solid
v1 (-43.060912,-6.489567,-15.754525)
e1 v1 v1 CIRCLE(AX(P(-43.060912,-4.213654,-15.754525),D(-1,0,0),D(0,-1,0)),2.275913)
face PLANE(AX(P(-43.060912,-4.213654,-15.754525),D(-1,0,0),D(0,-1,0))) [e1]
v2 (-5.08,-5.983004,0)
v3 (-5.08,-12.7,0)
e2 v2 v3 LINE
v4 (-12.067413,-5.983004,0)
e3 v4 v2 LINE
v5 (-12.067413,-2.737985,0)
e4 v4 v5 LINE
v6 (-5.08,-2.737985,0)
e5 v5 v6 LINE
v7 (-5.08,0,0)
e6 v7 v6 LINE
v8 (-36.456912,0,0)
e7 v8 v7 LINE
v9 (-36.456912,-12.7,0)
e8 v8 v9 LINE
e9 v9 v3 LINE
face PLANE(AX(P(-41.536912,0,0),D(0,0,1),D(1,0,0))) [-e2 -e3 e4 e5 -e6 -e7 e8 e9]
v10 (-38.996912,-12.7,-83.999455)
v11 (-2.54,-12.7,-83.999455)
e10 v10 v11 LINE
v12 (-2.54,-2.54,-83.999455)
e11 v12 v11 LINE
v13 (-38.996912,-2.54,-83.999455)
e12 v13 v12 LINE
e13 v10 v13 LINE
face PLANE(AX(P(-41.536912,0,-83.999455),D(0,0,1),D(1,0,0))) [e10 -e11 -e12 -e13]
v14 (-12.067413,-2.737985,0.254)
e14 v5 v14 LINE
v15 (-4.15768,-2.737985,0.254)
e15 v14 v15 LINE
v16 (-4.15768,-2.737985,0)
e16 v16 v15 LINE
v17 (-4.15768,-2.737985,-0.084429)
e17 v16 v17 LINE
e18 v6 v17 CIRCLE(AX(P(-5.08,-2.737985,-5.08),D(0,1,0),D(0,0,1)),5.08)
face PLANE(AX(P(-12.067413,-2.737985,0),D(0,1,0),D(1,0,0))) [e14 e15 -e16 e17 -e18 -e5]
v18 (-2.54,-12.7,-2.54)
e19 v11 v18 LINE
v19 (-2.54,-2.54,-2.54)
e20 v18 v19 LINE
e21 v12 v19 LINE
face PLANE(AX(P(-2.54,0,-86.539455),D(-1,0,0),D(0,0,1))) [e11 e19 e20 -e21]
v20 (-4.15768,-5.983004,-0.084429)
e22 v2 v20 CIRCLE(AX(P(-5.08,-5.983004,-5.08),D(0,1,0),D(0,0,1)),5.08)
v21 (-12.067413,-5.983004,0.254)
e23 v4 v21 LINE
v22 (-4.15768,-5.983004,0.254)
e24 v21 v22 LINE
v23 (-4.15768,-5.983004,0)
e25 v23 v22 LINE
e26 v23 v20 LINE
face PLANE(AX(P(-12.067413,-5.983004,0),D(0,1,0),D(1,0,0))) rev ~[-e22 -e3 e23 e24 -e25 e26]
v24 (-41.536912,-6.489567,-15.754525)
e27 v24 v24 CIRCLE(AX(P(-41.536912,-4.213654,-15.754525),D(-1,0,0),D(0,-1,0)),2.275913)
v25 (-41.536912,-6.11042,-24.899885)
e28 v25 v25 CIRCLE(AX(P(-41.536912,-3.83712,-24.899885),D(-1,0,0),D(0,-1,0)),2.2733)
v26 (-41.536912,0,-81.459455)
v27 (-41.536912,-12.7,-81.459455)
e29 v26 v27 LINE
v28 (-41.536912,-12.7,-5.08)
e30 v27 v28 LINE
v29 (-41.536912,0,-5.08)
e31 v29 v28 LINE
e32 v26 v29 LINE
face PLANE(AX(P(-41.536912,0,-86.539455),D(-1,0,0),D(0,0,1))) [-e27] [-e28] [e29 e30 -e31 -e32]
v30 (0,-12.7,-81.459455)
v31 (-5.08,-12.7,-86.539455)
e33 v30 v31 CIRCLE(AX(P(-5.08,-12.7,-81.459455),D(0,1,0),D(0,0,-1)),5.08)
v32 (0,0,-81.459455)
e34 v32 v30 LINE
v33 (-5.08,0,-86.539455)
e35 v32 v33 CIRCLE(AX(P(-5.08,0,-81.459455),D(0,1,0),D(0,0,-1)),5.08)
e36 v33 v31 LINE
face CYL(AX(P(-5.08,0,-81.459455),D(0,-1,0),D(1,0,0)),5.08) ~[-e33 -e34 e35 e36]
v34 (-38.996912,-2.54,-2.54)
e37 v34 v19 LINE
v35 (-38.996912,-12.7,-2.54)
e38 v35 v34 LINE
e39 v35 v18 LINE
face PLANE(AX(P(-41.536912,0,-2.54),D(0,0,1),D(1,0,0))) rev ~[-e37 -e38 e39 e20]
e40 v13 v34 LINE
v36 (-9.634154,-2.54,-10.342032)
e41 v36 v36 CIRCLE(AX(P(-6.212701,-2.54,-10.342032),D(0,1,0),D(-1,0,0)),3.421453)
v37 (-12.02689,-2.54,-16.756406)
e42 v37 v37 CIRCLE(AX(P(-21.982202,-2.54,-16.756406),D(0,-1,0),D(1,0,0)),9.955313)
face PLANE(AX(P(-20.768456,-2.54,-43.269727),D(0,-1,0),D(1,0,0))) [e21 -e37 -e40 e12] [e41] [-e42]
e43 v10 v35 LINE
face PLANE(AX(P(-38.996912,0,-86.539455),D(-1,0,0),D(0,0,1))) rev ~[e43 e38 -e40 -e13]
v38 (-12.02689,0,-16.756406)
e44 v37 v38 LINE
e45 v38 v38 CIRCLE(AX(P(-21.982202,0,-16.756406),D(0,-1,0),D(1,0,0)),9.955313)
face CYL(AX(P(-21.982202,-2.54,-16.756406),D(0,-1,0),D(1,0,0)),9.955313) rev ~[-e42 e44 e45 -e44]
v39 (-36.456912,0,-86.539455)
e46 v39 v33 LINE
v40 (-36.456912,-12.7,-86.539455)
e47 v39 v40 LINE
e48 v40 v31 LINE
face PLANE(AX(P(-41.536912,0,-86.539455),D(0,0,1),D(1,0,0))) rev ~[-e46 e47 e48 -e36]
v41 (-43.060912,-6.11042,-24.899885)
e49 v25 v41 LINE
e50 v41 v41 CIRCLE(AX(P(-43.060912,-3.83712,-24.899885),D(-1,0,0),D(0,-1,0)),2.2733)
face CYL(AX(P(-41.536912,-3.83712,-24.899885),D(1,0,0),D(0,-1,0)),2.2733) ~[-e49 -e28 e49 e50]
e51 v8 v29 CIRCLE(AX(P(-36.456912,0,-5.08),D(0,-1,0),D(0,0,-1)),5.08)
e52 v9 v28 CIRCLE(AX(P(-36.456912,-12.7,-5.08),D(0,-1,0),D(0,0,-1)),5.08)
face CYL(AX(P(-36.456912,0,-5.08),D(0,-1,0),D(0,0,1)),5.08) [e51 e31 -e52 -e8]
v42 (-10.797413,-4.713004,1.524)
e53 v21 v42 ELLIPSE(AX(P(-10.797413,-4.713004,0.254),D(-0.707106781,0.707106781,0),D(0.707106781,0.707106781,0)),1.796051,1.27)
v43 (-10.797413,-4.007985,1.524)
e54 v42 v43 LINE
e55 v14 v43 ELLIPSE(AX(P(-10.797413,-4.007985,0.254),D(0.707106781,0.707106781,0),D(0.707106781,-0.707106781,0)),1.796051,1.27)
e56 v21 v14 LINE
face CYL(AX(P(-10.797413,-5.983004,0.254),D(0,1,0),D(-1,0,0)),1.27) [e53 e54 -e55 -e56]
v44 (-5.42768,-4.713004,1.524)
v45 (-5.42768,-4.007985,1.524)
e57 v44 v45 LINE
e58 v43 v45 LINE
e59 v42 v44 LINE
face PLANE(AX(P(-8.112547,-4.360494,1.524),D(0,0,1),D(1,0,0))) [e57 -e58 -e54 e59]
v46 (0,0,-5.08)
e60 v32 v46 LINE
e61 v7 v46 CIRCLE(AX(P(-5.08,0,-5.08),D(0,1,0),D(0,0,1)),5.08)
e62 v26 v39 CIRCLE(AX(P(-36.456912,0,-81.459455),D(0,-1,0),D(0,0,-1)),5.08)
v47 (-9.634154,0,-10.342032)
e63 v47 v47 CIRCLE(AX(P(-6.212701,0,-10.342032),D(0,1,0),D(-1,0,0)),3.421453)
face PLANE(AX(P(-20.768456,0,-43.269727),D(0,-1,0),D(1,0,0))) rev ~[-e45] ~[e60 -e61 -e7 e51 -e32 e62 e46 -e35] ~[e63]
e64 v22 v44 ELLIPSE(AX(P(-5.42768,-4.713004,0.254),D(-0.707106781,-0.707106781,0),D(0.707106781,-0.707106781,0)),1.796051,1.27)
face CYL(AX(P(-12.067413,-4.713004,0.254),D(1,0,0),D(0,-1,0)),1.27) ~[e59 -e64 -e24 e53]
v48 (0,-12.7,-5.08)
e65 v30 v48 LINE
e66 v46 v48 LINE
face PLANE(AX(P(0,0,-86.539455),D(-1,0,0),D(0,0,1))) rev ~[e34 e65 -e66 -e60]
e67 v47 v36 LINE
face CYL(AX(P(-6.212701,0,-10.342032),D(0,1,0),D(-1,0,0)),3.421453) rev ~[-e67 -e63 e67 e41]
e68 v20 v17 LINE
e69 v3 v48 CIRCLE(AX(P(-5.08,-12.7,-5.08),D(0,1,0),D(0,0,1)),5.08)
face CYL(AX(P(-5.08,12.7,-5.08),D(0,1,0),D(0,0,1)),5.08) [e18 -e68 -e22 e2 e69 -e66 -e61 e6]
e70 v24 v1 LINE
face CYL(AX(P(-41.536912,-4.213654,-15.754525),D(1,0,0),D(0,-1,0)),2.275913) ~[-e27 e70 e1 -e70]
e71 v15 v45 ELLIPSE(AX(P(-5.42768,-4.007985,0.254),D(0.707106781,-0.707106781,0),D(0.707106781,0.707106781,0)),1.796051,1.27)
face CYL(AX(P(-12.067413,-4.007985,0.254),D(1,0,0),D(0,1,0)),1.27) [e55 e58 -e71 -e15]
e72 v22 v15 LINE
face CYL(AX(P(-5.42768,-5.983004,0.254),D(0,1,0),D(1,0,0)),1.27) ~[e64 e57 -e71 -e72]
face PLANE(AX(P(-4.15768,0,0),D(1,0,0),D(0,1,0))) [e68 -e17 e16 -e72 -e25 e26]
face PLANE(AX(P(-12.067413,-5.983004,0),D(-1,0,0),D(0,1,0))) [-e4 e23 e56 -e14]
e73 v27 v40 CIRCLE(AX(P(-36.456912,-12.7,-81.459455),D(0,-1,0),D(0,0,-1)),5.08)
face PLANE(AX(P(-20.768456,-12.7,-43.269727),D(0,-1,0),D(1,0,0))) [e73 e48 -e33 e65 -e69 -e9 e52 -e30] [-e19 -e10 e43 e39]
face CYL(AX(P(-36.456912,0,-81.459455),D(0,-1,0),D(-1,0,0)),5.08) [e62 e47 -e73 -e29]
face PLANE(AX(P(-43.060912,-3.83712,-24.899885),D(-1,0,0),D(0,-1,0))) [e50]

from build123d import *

# Parameters (mm, degrees)
F0_W          = 41.536912322
F0_H          = 86.5394547582
F1_DEPTH      = 12.7
F2_T          = -2.54
F3_R          = 2.2759132083
F5_DEPTH      = 1.524
F4_R          = 2.2733
F6_DEPTH      = 1.524
F7_W          = 7.9097328708
F7_H          = 3.2450191211
F8_DEPTH      = 1.524
F9_R          = 1.27
F10_R         = 5.08
F11_R         = 5.08
F12_T4_DEPTH  = 38.1
F12_T10_DEPTH = 38.1
F12_T16_DEPTH = 38.1
F12_T23_DEPTH = 38.1
F12_T29_DEPTH = 38.1
F13_R         = 5.08
F14_R         = 3.4214532803
F15_DEPTH     = 37.77729
F16_R         = 9.955312615
F17_DEPTH     = 26.73123


# Not quite as in the source:
# - a fillet or chamfer that OpenCascade refuses, or shapes differently, is made with other operations: its cross-section is extruded or revolved along the edge and cut away or added


with BuildPart() as f1:
    # F0 (on Front) → F1 (new body)
    with BuildSketch(Plane.XZ):
        with Locations((-20.768456161, -43.2697273791)):
            Rectangle(F0_W, F0_H)
    extrude(amount=F1_DEPTH)

    # F2
    f2_openings = [f1.faces().sort_by_distance(p)[0] for p in [
        (-20.768456, -12.7, -43.269727),
    ]]
    offset(amount=F2_T, openings=f2_openings)

    # F3 (on face) → F5 (join)
    with BuildSketch(Plane(origin=(-41.536912322, 0, 0), x_dir=(0, -1, 0), z_dir=(-1, 0, 0))):
        with Locations((4.2136539705, -15.7545246184)):
            Circle(F3_R)
    extrude(amount=F5_DEPTH)

    # F4 (on face) → F6 (join)
    with BuildSketch(Plane(origin=(-41.536912322, 0, 0), x_dir=(0, -1, 0), z_dir=(-1, 0, 0))):
        with Locations((3.8371200208, -24.8998850584)):
            Circle(F4_R)
    extrude(amount=F6_DEPTH)

    # F7 (on face) → F8 (join)
    with BuildSketch(Plane.XY):
        with Locations((-8.1125465222, -4.3604943203)):
            Rectangle(F7_W, F7_H)
    extrude(amount=F8_DEPTH)

    # F9
    f9_edges = [f1.edges().sort_by_distance(p)[0] for p in [
        (-8.112547, -2.737985, 1.524),
        (-12.067413, -4.360494, 1.524),
        (-8.112547, -5.983004, 1.524),
        (-4.15768, -4.360494, 1.524),
    ]]
    fillet(f9_edges, radius=F9_R)

    # F10
    f10_edges = [f1.edges().sort_by_distance(p)[0] for p in [
        (-41.536912, -6.35, 0),
    ]]
    fillet(f10_edges, radius=F10_R)

    # F11
    f11_edges = [f1.edges().sort_by_distance(p)[0] for p in [
        (-41.536912, -6.35, -86.539455),
    ]]
    fillet(f11_edges, radius=F11_R)

    # F12: fillet of radius 5.08 on 1 edges, made by hand


with BuildPart() as f12_tool2:
    # F12_s3 → F12_t4 (new body)
    with BuildSketch(Plane.XZ.offset(-12.7)):
        with BuildLine():
            ThreePointArc((-5.08, 0), (-1.4878975516, -1.4878975516), (0, -5.08))
            Line((0, -5.08), (0, 0))
            Line((0, 0), (-5.08, 0))
        make_face()
    extrude(amount=F12_T4_DEPTH)

    split(bisect_by=Plane.YZ.offset(-4.1576800868), keep=Keep.BOTTOM)

    split(bisect_by=Plane.XZ.offset(2.7379847597), keep=Keep.BOTTOM)


with BuildPart() as f1_1:
    add(f1.part)

    # F12_t1: cut F12_tool2
    add(f12_tool2.part, mode=Mode.SUBTRACT)


with BuildPart() as f12_tool8:
    # F12_s9 → F12_t10 (new body)
    with BuildSketch(Plane.XZ.offset(-12.7)):
        with BuildLine():
            ThreePointArc((-5.08, 0), (-1.4878975516, -1.4878975516), (0, -5.08))
            Line((0, -5.08), (0, 0))
            Line((0, 0), (-5.08, 0))
        make_face()
    extrude(amount=F12_T10_DEPTH)

    split(bisect_by=Plane.YZ.offset(-4.1576800868), keep=Keep.TOP)

    split(bisect_by=Plane.XZ.offset(2.7379847597), keep=Keep.BOTTOM)


with BuildPart() as f1_2:
    add(f1_1.part)

    # F12_t7: cut F12_tool8
    add(f12_tool8.part, mode=Mode.SUBTRACT)


with BuildPart() as f12_tool14:
    # F12_s15 → F12_t16 (new body)
    with BuildSketch(Plane.XZ.offset(-12.7)):
        with BuildLine():
            ThreePointArc((-5.08, 0), (-1.4878975516, -1.4878975516), (0, -5.08))
            Line((0, -5.08), (0, 0))
            Line((0, 0), (-5.08, 0))
        make_face()
    extrude(amount=F12_T16_DEPTH)

    split(bisect_by=Plane.YZ.offset(-4.1576800868), keep=Keep.TOP)

    split(bisect_by=Plane.XZ.offset(5.9830038808), keep=Keep.BOTTOM)

    split(bisect_by=Plane.XZ.offset(2.7379847597), keep=Keep.TOP)


with BuildPart() as f1_3:
    add(f1_2.part)

    # F12_t13: cut F12_tool14
    add(f12_tool14.part, mode=Mode.SUBTRACT)


with BuildPart() as f12_tool21:
    # F12_s22 → F12_t23 (new body)
    with BuildSketch(Plane.XZ.offset(-12.7)):
        with BuildLine():
            ThreePointArc((-5.08, 0), (-1.4878975516, -1.4878975516), (0, -5.08))
            Line((0, -5.08), (0, 0))
            Line((0, 0), (-5.08, 0))
        make_face()
    extrude(amount=F12_T23_DEPTH)

    split(bisect_by=Plane.YZ.offset(-4.1576800868), keep=Keep.BOTTOM)

    split(bisect_by=Plane.XZ.offset(5.9830038808), keep=Keep.TOP)


with BuildPart() as f1_4:
    add(f1_3.part)

    # F12_t20: cut F12_tool21
    add(f12_tool21.part, mode=Mode.SUBTRACT)


with BuildPart() as f12_tool27:
    # F12_s28 → F12_t29 (new body)
    with BuildSketch(Plane.XZ.offset(-12.7)):
        with BuildLine():
            ThreePointArc((-5.08, 0), (-1.4878975516, -1.4878975516), (0, -5.08))
            Line((0, -5.08), (0, 0))
            Line((0, 0), (-5.08, 0))
        make_face()
    extrude(amount=F12_T29_DEPTH)

    split(bisect_by=Plane.YZ.offset(-4.1576800868), keep=Keep.TOP)

    split(bisect_by=Plane.XZ.offset(5.9830038808), keep=Keep.TOP)


with BuildPart() as f1_5:
    add(f1_4.part)

    # F12_t26: cut F12_tool27
    add(f12_tool27.part, mode=Mode.SUBTRACT)

    # F13
    f13_edges = [f1_5.edges().sort_by_distance(p)[0] for p in [
        (0, -6.35, -86.539455),
    ]]
    fillet(f13_edges, radius=F13_R)

    # F14 (on face) → F15 (cut)
    with BuildSketch(Plane(origin=(0, 0, 0), x_dir=(-1, 0, 0), z_dir=(0, 1, 0))):
        with Locations((6.212700624, -10.3420317173)):
            Circle(F14_R)
    extrude(amount=-F15_DEPTH, mode=Mode.SUBTRACT)

    # F16 (on face) → F17 (cut)
    with BuildSketch(Plane.XZ.offset(2.54)):
        with Locations((-21.9822023064, -16.7564060539)):
            Circle(F16_R)
    extrude(amount=-F17_DEPTH, mode=Mode.SUBTRACT)


solid = f1_5.part
